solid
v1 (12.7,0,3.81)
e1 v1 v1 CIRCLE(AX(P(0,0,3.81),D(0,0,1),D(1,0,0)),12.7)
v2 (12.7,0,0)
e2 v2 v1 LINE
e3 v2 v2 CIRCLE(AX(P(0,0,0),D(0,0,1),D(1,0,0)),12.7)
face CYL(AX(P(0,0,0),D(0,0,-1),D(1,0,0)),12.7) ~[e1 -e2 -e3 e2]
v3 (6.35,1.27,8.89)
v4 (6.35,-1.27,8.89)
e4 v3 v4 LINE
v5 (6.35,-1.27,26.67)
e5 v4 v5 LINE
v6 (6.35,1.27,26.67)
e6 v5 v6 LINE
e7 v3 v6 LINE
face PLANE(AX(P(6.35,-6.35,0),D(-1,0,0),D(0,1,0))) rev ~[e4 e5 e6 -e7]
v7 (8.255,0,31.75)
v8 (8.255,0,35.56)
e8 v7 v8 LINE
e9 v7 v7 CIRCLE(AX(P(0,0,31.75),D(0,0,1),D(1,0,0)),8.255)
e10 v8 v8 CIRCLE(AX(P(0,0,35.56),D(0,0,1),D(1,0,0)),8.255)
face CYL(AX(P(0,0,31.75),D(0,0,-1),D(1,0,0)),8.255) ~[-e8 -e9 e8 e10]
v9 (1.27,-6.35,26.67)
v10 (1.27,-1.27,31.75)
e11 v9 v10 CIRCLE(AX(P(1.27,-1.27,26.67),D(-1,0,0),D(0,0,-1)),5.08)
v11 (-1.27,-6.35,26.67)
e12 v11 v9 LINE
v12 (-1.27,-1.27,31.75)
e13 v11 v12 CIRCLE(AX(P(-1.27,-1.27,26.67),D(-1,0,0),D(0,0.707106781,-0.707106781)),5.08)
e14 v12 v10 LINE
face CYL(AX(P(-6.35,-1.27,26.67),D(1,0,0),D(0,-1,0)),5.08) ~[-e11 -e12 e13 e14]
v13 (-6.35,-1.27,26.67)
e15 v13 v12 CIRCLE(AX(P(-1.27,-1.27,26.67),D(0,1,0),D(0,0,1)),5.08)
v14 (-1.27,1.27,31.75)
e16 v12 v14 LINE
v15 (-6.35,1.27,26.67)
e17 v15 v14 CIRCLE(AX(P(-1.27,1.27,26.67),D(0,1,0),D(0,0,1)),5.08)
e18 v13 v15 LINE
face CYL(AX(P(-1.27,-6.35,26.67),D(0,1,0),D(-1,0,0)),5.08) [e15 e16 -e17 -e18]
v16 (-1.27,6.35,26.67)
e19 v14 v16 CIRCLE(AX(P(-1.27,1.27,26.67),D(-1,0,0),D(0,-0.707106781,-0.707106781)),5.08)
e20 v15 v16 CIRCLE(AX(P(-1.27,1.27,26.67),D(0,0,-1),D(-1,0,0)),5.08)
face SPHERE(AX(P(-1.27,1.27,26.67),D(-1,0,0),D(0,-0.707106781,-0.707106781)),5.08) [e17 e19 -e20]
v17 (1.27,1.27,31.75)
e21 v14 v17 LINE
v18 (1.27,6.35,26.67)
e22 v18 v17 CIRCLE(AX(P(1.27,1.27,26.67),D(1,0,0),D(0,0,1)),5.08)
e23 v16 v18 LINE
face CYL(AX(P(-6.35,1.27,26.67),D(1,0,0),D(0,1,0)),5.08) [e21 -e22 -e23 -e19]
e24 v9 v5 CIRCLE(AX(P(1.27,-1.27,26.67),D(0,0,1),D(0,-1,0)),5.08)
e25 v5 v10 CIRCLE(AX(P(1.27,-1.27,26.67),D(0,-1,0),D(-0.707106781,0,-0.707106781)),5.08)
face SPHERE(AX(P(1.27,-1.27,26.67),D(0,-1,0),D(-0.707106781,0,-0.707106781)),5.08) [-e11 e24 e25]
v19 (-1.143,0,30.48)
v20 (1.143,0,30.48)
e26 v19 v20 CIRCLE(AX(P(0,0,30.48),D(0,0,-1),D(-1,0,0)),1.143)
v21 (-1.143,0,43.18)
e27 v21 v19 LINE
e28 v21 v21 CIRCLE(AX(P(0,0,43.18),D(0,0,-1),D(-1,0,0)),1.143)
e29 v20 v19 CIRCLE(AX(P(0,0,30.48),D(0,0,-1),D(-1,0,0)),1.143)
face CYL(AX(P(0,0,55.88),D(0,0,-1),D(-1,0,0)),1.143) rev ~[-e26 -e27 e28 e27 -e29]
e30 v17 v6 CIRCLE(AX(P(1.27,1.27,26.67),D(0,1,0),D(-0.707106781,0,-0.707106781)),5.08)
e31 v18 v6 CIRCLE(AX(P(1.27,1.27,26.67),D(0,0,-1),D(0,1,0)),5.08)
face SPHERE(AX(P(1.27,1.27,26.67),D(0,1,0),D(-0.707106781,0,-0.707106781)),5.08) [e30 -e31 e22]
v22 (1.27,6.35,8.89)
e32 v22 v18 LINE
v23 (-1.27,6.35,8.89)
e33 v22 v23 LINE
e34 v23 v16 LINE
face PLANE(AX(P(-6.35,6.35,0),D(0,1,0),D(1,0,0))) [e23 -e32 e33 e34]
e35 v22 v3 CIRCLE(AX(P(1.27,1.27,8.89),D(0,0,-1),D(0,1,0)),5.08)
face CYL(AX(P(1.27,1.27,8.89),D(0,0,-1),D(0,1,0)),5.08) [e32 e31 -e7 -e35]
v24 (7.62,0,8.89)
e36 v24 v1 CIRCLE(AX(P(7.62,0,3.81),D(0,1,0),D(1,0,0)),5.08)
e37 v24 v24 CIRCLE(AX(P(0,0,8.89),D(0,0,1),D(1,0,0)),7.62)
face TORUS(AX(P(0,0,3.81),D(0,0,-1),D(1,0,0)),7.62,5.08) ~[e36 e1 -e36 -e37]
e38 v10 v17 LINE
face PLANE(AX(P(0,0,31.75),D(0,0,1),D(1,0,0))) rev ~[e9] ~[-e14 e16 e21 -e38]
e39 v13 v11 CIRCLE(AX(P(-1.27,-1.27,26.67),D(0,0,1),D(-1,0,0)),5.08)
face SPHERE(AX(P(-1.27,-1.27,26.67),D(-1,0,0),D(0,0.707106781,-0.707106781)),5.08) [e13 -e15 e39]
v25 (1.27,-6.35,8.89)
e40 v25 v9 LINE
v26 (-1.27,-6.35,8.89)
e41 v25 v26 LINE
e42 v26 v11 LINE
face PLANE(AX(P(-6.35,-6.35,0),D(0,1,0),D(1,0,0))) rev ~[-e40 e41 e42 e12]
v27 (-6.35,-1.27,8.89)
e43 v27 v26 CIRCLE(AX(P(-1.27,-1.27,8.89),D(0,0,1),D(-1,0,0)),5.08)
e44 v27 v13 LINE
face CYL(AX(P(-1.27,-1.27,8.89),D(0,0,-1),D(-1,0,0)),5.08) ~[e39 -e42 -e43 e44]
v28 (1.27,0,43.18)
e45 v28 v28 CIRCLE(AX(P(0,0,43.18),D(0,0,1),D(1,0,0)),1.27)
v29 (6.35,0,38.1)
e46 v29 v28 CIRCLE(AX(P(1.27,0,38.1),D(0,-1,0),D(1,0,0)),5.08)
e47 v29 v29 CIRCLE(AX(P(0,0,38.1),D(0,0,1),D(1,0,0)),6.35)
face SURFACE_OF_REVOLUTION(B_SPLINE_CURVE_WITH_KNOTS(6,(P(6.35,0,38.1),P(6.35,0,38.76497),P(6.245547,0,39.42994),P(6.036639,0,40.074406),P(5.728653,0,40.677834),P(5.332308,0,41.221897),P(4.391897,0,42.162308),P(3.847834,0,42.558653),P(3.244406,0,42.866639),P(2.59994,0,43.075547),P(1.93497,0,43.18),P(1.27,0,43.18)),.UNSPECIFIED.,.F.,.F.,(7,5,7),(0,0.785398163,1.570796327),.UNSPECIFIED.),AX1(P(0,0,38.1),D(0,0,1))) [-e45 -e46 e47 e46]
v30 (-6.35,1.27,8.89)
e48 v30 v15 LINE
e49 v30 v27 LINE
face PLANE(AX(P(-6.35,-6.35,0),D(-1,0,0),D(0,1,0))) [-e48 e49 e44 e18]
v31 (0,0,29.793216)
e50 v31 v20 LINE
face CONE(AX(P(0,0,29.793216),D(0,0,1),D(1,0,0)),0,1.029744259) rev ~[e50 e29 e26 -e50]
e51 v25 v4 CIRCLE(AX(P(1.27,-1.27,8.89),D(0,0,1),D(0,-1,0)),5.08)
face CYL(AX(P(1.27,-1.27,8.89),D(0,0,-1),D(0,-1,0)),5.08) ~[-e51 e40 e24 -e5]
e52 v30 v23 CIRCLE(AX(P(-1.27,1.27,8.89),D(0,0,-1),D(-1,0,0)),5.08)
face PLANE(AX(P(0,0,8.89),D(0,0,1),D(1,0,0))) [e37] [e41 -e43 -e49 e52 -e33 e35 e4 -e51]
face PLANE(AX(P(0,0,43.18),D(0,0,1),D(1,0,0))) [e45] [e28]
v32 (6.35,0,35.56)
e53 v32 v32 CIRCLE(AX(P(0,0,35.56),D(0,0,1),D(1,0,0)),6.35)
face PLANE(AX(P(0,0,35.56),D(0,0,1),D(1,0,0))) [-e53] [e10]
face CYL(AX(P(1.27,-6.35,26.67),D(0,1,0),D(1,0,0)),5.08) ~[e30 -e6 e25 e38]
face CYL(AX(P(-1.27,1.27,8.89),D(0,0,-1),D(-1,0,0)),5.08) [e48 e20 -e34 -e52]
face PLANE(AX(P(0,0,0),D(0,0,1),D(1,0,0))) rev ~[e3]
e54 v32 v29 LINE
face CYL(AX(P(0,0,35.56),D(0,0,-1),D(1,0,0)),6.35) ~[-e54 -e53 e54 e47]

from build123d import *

# Parameters (mm, degrees)
F0_R         = 12.7
F1_DEPTH     = 8.89
F2_W         = 12.7
F2_H         = 12.7
F3_DEPTH     = 31.75
F4_R         = 5.08
F5_T1_DEPTH  = 17.78
F5_S5_W      = 5.08
F5_S5_H      = 5.08
F5_T6_DEPTH  = 5.08
F5_S11_W     = 5.08
F5_S11_H     = 5.08
F5_T12_DEPTH = 5.08
F5_S17_W     = 5.08
F5_S17_H     = 5.08
F5_T18_DEPTH = 5.08
F5_S23_W     = 5.08
F5_S23_H     = 5.08
F5_T24_DEPTH = 5.08
F6_R         = 8.255
F7_DEPTH     = 3.81
F8_R         = 6.35
F9_DEPTH     = 7.62
F10_R        = 5.08
F12_D        = 2.286
F12_DEPTH    = 12.7
F12_TIP      = 0.6867836875
F13_R        = 5.08


# Not quite as in the source:
# - a fillet or chamfer that OpenCascade refuses, or shapes differently, is made with other operations: its cross-section is extruded or revolved along the edge and cut away or added


with BuildPart() as f1:
    # F0 (on Top) → F1 (new body)
    with BuildSketch(Plane.XY):
        Circle(F0_R)
    extrude(amount=F1_DEPTH)

    # F2 (on Top) → F3 (join)
    with BuildSketch(Plane.XY):
        Rectangle(F2_W, F2_H)
    extrude(amount=F3_DEPTH)

    # F4
    f4_edges = [f1.edges().sort_by_distance(p)[0] for p in [
        (6.35, 0, 31.75),
        (0, -6.35, 31.75),
        (-6.35, 0, 31.75),
        (0, 6.35, 31.75),
    ]]
    fillet(f4_edges, radius=F4_R)

    # F5: fillet of radius 5.08 on 4 edges, made by hand

    # F5_s2 → F5_t1 (cut)
    with BuildSketch(Plane.XY.offset(8.89)):
        with BuildLine():
            ThreePointArc((1.27, -6.35), (4.8621024484, -4.8621024484), (6.35, -1.27))
            Line((6.35, -1.27), (6.35, -6.35))
            Line((6.35, -6.35), (1.27, -6.35))
        make_face()
        with BuildLine():
            ThreePointArc((-6.35, -1.27), (-4.8621024484, -4.8621024484), (-1.27, -6.35))
            Line((-1.27, -6.35), (-6.35, -6.35))
            Line((-6.35, -6.35), (-6.35, -1.27))
        make_face()
        with BuildLine():
            ThreePointArc((-6.35, 1.27), (-4.8621024484, 4.8621024484), (-1.27, 6.35))
            Line((-1.27, 6.35), (-6.35, 6.35))
            Line((-6.35, 6.35), (-6.35, 1.27))
        make_face()
        with BuildLine():
            ThreePointArc((1.27, 6.35), (4.8621024484, 4.8621024484), (6.35, 1.27))
            Line((6.35, 1.27), (6.35, 6.35))
            Line((6.35, 6.35), (1.27, 6.35))
        make_face()
    extrude(amount=F5_T1_DEPTH, mode=Mode.SUBTRACT)


with BuildPart() as f5_tool4:
    # F5_s5 → F5_t6 (new body)
    with BuildSketch(Plane.XZ.offset(-1.27)):
        with Locations((3.81, 29.21)):
            Rectangle(F5_S5_W, F5_S5_H)
    extrude(amount=-F5_T6_DEPTH)

    # F5_s7 → F5_t8 (revolve, cut)
    with BuildSketch(Plane(origin=(1.27, 1.27, 26.67), x_dir=(-0.7071067812, 0, -0.7071067812), z_dir=(0.7071067812, 0, -0.7071067812))):
        with BuildLine():
            ThreePointArc((0, -5.08), (5.08, 0), (0, 5.08))
            Line((0, 5.08), (0, -5.08))
        make_face()
    revolve(axis=Axis((1.27, 1.27, 26.67), (0, 1, 0)), mode=Mode.SUBTRACT)


with BuildPart() as f1_1:
    add(f1.part)

    # F5_t3: cut F5_tool4
    add(f5_tool4.part, mode=Mode.SUBTRACT)


with BuildPart() as f5_tool10:
    # F5_s11 → F5_t12 (new body)
    with BuildSketch(Plane.YZ.offset(-1.27)):
        with Locations((3.81, 29.21)):
            Rectangle(F5_S11_W, F5_S11_H)
    extrude(amount=-F5_T12_DEPTH)

    # F5_s13 → F5_t14 (revolve, cut)
    with BuildSketch(Plane(origin=(-1.27, 1.27, 26.67), x_dir=(0, -0.7071067812, -0.7071067812), z_dir=(0, 0.7071067812, -0.7071067812))):
        with BuildLine():
            ThreePointArc((0, -5.08), (5.08, 0), (0, 5.08))
            Line((0, 5.08), (0, -5.08))
        make_face()
    revolve(axis=Axis((-1.27, 1.27, 26.67), (-1, 0, 0)), mode=Mode.SUBTRACT)


with BuildPart() as f1_2:
    add(f1_1.part)

    # F5_t9: cut F5_tool10
    add(f5_tool10.part, mode=Mode.SUBTRACT)


with BuildPart() as f5_tool16:
    # F5_s17 → F5_t18 (new body)
    with BuildSketch(Plane.YZ.offset(-1.27)):
        with Locations((-3.81, 29.21)):
            Rectangle(F5_S17_W, F5_S17_H)
    extrude(amount=-F5_T18_DEPTH)

    # F5_s19 → F5_t20 (revolve, cut)
    with BuildSketch(Plane(origin=(-1.27, -1.27, 26.67), x_dir=(0, 0.7071067812, -0.7071067812), z_dir=(0, 0.7071067812, 0.7071067812))):
        with BuildLine():
            ThreePointArc((0, -5.08), (5.08, 0), (0, 5.08))
            Line((0, 5.08), (0, -5.08))
        make_face()
    revolve(axis=Axis((-1.27, -1.27, 26.67), (-1, 0, 0)), mode=Mode.SUBTRACT)


with BuildPart() as f1_3:
    add(f1_2.part)

    # F5_t15: cut F5_tool16
    add(f5_tool16.part, mode=Mode.SUBTRACT)


with BuildPart() as f5_tool22:
    # F5_s23 → F5_t24 (new body)
    with BuildSketch(Plane.XZ.offset(1.27)):
        with Locations((3.81, 29.21)):
            Rectangle(F5_S23_W, F5_S23_H)
    extrude(amount=F5_T24_DEPTH)

    # F5_s25 → F5_t26 (revolve, cut)
    with BuildSketch(Plane(origin=(1.27, -1.27, 26.67), x_dir=(-0.7071067812, 0, -0.7071067812), z_dir=(-0.7071067812, 0, 0.7071067812))):
        with BuildLine():
            ThreePointArc((0, -5.08), (5.08, 0), (0, 5.08))
            Line((0, 5.08), (0, -5.08))
        make_face()
    revolve(axis=Axis((1.27, -1.27, 26.67), (0, -1, 0)), mode=Mode.SUBTRACT)


with BuildPart() as f1_4:
    add(f1_3.part)

    # F5_t21: cut F5_tool22
    add(f5_tool22.part, mode=Mode.SUBTRACT)

    # F6 (on face) → F7 (join)
    with BuildSketch(Plane.XY.offset(31.75)):
        Circle(F6_R)
    extrude(amount=F7_DEPTH)

    # F8 (on face) → F9 (join)
    with BuildSketch(Plane.XY.offset(35.56)):
        Circle(F8_R)
    extrude(amount=F9_DEPTH)

    # F10
    f10_edges = [f1_4.edges().sort_by_distance(p)[0] for p in [
        (-6.35, 0, 43.18),
    ]]
    fillet(f10_edges, radius=F10_R)

    # F12
    with Locations(Plane.XY.offset(43.18)):
        with Locations((0, 0)):
            Hole(F12_D / 2, depth=F12_DEPTH)
            with Locations((0, 0, -(F12_DEPTH + F12_TIP / 2))):  # 118° drill point
                Cone(0, F12_D / 2, F12_TIP, mode=Mode.SUBTRACT)

    # F13
    f13_edges = [f1_4.edges().sort_by_distance(p)[0] for p in [
        (-12.7, 0, 8.89),
    ]]
    fillet(f13_edges, radius=F13_R)


solid = f1_4.part
